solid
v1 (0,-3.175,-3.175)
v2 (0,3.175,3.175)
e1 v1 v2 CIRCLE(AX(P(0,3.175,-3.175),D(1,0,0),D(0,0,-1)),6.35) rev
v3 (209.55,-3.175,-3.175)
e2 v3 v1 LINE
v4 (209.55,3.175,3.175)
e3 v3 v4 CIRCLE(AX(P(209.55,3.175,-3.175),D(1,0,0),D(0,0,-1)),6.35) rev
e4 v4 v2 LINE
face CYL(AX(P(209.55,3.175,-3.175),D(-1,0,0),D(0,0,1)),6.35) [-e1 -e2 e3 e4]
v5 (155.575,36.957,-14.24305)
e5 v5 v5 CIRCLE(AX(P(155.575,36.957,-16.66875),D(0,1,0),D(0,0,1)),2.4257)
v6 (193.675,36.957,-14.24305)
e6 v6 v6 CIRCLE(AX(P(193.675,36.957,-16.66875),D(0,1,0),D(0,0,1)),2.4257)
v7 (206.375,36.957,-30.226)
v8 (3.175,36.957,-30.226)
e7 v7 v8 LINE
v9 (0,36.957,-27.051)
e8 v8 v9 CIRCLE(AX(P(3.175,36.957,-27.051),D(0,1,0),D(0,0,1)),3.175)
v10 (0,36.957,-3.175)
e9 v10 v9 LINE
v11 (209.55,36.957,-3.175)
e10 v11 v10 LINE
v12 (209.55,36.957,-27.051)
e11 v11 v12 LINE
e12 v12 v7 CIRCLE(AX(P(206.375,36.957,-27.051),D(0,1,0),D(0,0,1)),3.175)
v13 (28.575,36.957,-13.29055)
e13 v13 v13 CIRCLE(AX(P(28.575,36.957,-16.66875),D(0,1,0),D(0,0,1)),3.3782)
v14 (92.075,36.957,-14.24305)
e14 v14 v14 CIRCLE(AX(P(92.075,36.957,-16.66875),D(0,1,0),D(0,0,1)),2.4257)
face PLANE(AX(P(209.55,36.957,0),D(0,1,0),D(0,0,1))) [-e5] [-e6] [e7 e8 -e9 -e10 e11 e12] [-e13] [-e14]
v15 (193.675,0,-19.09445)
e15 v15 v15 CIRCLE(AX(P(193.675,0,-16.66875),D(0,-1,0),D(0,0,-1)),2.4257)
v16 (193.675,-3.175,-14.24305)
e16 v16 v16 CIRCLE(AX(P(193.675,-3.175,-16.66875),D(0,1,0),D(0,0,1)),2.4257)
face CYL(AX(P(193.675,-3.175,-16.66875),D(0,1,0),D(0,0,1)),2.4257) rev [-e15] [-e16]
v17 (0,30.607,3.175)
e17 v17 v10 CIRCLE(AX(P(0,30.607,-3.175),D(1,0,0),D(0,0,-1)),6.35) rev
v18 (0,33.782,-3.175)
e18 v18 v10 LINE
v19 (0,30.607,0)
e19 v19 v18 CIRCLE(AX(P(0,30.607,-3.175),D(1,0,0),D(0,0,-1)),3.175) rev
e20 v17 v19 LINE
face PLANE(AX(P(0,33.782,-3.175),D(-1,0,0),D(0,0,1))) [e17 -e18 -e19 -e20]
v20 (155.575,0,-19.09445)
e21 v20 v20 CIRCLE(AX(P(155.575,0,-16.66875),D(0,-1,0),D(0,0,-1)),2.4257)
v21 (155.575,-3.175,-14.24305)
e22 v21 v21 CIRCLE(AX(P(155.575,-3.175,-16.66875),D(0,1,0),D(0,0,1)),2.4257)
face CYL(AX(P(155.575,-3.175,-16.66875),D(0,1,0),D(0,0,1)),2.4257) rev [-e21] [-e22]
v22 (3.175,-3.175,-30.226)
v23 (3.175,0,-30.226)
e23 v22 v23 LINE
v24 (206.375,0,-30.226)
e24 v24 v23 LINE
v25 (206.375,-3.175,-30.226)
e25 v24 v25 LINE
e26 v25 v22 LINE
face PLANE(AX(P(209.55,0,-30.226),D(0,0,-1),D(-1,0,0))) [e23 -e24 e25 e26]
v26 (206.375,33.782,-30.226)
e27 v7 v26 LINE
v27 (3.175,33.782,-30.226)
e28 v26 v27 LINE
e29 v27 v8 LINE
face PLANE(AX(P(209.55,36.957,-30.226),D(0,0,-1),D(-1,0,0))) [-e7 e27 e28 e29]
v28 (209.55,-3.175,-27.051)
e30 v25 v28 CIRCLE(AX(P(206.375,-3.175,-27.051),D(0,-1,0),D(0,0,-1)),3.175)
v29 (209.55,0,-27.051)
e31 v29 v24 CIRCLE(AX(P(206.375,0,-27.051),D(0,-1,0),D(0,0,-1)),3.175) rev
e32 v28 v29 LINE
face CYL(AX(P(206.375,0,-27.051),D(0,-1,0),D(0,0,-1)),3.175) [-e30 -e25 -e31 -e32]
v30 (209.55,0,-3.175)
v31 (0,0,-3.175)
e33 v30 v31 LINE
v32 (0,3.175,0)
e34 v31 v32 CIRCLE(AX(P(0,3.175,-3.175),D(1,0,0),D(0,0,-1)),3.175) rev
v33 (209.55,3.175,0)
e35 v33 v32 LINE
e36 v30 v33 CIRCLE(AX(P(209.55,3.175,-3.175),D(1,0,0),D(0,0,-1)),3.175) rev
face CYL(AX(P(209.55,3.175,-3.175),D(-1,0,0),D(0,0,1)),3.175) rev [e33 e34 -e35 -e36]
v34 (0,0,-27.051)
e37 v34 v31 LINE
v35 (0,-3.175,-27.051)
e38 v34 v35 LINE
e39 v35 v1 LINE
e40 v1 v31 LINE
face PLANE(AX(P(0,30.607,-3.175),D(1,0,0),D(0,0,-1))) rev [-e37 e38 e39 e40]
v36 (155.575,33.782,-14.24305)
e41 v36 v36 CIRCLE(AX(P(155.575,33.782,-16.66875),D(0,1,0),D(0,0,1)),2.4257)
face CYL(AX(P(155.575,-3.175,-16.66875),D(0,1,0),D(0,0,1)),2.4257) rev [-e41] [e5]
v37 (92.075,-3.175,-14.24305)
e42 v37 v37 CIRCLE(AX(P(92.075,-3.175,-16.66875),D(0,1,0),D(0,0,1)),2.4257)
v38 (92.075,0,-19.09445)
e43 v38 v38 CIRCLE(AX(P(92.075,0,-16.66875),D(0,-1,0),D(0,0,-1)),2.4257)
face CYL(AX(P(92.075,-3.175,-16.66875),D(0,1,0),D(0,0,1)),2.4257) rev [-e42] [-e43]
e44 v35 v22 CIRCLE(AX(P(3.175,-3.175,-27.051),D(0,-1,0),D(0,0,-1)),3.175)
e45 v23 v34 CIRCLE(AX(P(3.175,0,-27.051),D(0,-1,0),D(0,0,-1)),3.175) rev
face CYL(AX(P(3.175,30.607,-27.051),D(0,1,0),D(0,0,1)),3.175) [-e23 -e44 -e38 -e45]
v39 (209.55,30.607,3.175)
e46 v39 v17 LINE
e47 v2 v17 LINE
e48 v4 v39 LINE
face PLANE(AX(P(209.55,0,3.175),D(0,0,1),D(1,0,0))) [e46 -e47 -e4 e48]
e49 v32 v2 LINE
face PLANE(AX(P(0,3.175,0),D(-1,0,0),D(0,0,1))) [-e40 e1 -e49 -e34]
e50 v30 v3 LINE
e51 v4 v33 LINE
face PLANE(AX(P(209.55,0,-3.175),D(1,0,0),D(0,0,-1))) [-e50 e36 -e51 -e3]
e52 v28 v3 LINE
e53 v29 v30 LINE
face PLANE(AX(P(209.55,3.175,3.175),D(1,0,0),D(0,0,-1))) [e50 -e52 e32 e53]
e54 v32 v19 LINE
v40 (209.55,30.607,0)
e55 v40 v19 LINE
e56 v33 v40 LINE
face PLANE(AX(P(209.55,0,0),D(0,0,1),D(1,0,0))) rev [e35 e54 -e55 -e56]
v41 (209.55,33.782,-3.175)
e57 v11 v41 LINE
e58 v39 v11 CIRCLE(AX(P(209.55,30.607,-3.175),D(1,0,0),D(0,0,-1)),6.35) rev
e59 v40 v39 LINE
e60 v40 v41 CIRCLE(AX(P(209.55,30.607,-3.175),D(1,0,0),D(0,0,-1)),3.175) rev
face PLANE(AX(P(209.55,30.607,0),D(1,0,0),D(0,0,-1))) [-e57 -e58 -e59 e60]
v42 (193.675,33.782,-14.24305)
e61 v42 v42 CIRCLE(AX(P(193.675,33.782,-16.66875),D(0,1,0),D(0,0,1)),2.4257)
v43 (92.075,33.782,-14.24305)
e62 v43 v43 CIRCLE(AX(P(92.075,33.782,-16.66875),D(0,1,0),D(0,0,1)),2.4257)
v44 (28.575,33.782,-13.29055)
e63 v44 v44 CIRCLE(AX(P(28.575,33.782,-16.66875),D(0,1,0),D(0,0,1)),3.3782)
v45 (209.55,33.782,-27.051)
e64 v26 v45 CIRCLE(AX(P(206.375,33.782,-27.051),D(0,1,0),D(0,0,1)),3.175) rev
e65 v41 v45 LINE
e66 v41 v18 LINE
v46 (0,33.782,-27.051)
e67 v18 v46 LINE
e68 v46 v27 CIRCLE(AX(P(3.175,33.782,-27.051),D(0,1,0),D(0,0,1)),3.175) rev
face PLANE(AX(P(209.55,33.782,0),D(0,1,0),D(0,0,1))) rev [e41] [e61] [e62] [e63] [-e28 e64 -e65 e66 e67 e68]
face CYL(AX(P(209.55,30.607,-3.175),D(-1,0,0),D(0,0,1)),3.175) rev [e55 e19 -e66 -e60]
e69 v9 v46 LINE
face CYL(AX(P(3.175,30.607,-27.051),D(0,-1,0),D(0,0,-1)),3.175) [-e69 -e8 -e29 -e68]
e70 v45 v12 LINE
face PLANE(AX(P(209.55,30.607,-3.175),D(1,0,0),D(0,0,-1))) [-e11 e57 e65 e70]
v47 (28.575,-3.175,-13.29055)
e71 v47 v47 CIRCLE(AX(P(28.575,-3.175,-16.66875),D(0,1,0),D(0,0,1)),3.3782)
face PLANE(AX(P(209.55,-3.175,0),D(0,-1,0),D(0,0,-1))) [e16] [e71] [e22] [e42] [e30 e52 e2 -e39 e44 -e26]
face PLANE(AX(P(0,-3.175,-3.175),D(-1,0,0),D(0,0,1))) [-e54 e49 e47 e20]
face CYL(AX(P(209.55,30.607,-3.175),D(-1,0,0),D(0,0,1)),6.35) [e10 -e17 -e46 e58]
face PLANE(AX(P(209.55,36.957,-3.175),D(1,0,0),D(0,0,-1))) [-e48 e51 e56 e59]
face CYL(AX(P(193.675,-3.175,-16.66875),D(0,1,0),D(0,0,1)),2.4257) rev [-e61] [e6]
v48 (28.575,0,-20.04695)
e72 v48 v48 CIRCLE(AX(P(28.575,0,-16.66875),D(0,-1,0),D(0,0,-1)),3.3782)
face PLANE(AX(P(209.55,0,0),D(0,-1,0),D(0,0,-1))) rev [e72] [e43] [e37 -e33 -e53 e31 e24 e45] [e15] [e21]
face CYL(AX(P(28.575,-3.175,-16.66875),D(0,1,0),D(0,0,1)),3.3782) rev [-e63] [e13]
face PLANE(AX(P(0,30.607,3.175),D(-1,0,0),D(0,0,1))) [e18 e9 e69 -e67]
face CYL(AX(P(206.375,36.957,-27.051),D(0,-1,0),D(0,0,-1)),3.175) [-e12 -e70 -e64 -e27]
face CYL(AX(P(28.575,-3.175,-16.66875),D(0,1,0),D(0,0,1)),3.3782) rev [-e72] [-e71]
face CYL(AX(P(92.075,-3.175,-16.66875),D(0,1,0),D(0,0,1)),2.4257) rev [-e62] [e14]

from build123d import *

# Parameters (mm, degrees)
BASE_FLANGE1_DEPTH = 209.55
SKETCH6_R          = 3.3782
SKETCH6_R_2        = 2.4257
CUT_EXTRUDE1_DEPTH = 216.488725923
FILLET1_R          = 3.175


# Sheet-metal steps are written as plain solids
with BuildPart() as part:
    # Sketch1 → Base-Flange1 (new body)
    with BuildSketch(Plane(origin=(0, 0, 0), x_dir=(0, 0, -1), z_dir=(1, 0, 0))):
        with BuildLine():
            Line((30.226, 33.782), (3.175, 33.782))
            ThreePointArc((3.175, 33.782), (0.92993597, 32.85206403), (0, 30.607))
            Line((0, 30.607), (0, 3.175))
            ThreePointArc((0, 3.175), (0.92993597, 0.92993597), (3.175, 0))
            Line((3.175, 0), (30.226, 0))
            Line((30.226, 0), (30.226, -3.175))
            Line((30.226, -3.175), (3.175, -3.175))
            ThreePointArc((3.175, -3.175), (-1.315128061, -1.315128061), (-3.175, 3.175))
            Line((-3.175, 3.175), (-3.175, 30.607))
            ThreePointArc((-3.175, 30.607), (-1.315128061, 35.097128061), (3.175, 36.957))
            Line((3.175, 36.957), (30.226, 36.957))
            Line((30.226, 36.957), (30.226, 33.782))
        make_face()
    extrude(amount=BASE_FLANGE1_DEPTH)

    # Sketch6 → Cut-Extrude1 (cut, through all)
    with BuildSketch(Plane(origin=(0, 36.957, 0), x_dir=(1, 0, 0), z_dir=(0, 1, 0))):
        with Locations(Location((28.575, 16.66875, 0), (0, 0, 270))):
            Circle(SKETCH6_R)
        with Locations(Location((92.075, 16.66875, 0), (0, 0, 270))):
            Circle(SKETCH6_R_2)
        with Locations(Location((155.575, 16.66875, 0), (0, 0, 270))):
            Circle(SKETCH6_R_2)
        with Locations(Location((193.675, 16.66875, 0), (0, 0, 270))):
            Circle(SKETCH6_R_2)
    extrude(amount=-CUT_EXTRUDE1_DEPTH, mode=Mode.SUBTRACT)

    # Fillet1
    fillet1_edges = [part.edges().sort_by_distance(p)[0] for p in [
        (0, -1.5875, -30.226),
        (0, 35.3695, -30.226),
        (209.55, -1.5875, -30.226),
        (209.55, 35.3695, -30.226),
    ]]
    fillet(fillet1_edges, radius=FILLET1_R)


solid = part.part
